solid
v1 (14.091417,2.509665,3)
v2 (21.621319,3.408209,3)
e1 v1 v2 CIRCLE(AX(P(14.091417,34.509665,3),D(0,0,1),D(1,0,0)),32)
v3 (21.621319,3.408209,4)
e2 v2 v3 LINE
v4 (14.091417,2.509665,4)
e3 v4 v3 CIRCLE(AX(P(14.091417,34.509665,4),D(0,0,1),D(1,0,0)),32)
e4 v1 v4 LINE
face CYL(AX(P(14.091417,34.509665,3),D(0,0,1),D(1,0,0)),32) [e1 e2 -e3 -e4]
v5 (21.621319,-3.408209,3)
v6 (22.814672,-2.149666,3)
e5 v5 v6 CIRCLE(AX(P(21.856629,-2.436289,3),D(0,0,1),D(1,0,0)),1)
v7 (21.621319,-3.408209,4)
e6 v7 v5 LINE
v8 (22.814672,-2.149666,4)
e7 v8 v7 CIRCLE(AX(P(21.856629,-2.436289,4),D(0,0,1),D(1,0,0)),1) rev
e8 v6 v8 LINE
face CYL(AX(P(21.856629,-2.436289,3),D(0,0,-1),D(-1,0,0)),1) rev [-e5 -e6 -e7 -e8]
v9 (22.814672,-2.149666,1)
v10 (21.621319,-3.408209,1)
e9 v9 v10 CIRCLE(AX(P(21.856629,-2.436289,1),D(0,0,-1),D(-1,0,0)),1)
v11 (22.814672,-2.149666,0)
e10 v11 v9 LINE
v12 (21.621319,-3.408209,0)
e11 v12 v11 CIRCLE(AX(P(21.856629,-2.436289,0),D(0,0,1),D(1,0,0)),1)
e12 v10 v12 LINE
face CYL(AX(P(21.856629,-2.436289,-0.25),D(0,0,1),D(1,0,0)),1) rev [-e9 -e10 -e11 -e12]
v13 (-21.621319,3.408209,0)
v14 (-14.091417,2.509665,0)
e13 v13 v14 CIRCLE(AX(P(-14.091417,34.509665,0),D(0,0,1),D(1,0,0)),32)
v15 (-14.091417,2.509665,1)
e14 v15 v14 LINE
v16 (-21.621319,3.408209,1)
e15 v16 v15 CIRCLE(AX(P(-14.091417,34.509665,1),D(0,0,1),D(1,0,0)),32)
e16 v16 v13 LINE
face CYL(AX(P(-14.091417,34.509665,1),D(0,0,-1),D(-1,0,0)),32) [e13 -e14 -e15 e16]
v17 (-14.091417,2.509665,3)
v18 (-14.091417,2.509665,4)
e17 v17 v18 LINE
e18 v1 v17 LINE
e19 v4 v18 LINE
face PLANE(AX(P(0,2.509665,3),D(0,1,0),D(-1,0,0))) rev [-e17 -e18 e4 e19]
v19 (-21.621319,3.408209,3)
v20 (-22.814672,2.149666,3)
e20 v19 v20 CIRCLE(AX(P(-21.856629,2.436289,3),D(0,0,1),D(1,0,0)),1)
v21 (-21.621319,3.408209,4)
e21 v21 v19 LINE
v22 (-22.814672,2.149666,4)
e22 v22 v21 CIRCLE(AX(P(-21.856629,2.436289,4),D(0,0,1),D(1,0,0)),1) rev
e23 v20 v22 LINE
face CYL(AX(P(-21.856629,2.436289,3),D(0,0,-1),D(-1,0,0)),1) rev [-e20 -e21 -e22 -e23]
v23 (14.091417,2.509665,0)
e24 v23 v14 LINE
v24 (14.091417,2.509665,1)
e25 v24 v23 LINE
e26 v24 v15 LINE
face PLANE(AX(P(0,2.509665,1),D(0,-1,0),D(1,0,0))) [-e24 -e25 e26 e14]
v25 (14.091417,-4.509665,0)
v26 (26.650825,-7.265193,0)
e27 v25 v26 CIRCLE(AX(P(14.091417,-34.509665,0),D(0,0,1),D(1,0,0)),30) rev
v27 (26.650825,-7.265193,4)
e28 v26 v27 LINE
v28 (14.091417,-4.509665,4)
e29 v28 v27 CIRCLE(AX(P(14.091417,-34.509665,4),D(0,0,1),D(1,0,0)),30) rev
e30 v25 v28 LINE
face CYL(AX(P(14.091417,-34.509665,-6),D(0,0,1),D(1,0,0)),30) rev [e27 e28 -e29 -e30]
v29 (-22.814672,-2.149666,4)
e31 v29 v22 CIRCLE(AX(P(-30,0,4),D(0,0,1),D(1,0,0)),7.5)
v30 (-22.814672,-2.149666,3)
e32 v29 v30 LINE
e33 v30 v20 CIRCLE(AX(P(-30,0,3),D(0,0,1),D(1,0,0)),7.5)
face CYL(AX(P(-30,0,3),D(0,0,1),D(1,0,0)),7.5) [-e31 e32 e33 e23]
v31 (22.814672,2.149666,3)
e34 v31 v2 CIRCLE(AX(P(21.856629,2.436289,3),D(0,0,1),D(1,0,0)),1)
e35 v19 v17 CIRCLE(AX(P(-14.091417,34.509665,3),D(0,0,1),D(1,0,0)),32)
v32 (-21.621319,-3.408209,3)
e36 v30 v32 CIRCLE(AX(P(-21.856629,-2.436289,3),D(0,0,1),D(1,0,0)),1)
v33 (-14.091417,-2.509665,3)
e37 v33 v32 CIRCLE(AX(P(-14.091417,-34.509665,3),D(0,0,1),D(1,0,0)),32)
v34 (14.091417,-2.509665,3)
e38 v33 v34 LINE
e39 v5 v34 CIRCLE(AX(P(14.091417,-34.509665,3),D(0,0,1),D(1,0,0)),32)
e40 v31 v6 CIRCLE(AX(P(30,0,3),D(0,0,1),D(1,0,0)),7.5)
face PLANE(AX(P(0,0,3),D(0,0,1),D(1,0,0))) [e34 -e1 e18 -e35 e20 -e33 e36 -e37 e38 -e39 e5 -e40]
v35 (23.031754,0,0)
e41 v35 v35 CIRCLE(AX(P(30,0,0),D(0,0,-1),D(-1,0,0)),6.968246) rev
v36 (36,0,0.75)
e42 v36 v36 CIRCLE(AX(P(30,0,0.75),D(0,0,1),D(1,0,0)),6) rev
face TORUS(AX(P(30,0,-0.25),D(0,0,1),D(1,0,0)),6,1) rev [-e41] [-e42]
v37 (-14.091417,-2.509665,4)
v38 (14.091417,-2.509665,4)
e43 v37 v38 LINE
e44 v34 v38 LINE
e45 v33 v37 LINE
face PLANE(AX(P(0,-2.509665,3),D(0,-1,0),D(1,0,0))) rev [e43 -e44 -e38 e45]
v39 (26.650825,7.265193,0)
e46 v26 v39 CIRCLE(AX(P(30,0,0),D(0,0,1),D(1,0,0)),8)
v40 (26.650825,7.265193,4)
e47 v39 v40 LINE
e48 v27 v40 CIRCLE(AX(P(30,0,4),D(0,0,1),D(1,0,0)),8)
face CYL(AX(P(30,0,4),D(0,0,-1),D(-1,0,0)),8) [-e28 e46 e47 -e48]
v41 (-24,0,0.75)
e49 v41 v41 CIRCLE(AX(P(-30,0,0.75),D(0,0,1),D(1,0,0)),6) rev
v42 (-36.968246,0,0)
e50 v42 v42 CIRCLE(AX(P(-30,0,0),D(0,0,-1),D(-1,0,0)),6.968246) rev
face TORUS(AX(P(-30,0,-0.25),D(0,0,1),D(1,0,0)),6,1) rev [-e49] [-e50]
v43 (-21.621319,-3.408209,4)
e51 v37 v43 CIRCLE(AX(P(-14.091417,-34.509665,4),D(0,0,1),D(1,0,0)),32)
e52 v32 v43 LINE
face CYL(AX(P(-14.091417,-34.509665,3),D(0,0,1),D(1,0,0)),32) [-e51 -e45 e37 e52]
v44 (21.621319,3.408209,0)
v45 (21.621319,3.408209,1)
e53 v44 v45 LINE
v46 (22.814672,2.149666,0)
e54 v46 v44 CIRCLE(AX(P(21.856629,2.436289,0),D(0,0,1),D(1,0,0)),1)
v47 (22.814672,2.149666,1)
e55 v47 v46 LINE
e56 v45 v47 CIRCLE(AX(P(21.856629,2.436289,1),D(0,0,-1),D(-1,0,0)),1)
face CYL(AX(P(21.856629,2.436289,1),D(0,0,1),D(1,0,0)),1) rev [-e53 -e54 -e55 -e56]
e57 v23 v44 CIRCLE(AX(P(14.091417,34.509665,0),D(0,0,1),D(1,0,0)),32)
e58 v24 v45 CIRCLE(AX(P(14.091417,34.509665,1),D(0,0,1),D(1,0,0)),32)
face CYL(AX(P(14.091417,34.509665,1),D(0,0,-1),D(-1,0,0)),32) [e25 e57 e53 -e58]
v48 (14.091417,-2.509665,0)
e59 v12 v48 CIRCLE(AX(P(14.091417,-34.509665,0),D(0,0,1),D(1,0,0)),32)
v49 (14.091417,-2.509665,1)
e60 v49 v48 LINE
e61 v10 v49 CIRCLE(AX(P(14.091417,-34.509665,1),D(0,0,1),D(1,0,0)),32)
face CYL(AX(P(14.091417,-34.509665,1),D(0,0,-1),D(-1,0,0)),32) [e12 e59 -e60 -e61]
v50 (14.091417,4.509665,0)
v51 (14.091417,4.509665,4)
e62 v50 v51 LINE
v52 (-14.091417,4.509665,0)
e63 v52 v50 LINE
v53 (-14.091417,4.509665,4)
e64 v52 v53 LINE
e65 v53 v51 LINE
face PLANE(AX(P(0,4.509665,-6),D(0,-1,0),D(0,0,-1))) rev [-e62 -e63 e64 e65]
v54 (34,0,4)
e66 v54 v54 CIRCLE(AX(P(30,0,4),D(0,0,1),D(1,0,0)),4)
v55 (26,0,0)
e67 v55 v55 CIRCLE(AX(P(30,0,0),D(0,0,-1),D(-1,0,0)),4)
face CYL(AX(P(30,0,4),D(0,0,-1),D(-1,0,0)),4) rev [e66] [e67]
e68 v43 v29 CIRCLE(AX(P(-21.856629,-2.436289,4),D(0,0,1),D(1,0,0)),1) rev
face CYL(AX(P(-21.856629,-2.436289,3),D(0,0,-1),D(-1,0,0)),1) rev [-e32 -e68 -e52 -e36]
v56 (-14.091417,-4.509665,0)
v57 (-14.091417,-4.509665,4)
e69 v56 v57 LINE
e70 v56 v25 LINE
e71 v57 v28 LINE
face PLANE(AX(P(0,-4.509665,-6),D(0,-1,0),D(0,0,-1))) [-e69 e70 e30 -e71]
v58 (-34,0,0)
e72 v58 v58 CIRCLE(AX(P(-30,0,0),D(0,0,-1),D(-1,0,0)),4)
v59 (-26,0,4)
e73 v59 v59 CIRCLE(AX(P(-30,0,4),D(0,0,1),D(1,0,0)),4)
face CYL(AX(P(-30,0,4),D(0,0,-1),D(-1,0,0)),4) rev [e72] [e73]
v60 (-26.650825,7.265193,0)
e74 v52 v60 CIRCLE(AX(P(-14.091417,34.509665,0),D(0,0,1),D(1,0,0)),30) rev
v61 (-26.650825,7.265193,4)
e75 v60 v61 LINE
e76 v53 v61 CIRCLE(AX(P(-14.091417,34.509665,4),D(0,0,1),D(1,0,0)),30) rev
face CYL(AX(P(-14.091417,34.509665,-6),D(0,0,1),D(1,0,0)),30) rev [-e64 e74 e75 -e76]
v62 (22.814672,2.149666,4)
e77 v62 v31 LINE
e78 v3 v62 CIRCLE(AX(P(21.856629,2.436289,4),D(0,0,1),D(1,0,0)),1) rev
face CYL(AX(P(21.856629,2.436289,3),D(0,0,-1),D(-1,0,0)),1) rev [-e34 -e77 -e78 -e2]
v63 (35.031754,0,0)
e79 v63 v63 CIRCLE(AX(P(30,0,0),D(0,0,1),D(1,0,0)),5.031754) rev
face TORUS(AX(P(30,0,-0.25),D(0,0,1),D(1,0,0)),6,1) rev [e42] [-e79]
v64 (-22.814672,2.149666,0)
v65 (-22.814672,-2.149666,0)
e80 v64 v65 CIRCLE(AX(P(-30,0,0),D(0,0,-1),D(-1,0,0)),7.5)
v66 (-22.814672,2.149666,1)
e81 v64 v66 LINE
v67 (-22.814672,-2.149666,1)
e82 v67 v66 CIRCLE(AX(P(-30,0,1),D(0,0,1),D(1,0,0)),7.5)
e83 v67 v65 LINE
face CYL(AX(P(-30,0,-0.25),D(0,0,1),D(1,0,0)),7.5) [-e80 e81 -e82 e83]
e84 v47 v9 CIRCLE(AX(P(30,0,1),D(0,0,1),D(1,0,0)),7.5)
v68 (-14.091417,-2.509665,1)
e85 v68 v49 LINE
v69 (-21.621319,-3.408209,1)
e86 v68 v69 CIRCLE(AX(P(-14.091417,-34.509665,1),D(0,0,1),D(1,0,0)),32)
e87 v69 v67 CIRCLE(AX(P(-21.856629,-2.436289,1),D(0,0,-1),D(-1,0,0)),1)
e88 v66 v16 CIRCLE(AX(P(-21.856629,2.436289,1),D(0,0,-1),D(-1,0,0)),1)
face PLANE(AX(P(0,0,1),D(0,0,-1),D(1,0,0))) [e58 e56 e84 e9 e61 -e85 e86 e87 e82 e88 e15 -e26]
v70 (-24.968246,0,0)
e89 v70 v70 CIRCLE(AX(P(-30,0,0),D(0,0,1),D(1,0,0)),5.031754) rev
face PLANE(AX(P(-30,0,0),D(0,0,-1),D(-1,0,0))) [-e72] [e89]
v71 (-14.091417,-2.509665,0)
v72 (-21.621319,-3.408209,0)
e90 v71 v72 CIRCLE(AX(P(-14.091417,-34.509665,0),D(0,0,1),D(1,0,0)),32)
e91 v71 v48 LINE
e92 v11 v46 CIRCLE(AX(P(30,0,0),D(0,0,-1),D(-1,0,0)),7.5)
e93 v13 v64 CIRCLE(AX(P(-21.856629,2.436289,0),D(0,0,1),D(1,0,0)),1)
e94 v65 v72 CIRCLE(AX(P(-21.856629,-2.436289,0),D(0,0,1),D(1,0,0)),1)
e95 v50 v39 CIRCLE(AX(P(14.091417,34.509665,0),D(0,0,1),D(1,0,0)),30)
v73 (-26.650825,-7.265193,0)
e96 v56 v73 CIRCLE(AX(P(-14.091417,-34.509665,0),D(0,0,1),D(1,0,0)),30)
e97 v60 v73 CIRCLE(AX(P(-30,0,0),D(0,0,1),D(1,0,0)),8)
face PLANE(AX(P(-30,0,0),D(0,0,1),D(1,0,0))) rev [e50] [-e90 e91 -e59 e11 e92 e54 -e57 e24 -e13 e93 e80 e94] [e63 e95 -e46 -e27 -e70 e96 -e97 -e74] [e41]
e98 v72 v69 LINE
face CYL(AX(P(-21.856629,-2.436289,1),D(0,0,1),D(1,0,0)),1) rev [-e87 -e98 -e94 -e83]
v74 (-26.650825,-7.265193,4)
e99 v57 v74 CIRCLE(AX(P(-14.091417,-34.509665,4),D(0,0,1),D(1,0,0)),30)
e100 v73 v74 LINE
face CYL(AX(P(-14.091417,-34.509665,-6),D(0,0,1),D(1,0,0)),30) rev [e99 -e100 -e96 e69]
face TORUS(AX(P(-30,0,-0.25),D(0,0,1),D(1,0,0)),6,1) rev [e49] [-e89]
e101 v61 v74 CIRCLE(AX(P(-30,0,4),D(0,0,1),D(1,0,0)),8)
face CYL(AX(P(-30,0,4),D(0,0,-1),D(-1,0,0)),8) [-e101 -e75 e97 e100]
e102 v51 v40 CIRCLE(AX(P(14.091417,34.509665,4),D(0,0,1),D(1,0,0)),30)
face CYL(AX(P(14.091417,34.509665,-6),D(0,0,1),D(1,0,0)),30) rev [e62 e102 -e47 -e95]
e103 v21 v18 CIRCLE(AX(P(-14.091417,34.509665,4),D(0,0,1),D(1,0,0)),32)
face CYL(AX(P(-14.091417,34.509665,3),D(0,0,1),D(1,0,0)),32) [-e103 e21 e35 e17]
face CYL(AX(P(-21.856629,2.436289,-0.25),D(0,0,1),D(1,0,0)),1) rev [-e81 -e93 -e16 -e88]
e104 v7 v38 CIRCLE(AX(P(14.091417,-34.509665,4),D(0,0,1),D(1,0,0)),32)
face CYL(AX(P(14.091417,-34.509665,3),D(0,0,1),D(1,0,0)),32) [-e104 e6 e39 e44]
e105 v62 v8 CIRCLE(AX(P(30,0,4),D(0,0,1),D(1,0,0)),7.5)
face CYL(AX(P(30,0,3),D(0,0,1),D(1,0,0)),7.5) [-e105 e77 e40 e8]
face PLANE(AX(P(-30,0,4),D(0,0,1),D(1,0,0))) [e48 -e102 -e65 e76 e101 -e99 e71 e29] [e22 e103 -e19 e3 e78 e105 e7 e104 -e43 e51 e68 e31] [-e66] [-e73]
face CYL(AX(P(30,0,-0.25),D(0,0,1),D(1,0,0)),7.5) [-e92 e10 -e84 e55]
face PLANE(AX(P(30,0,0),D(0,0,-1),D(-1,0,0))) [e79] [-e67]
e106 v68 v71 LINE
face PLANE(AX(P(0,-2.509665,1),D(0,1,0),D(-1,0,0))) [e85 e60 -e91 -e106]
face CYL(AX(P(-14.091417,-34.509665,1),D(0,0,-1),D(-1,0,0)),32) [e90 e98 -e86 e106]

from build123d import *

# Parameters (mm, degrees)
SKETCH_1_R             = 4
EXTRUDE_1_DEPTH        = 4
CUT_EXTRUDE_START      = -10
CUT_EXTRUDE_1_DEPTH    = 10
CUT_EXTRUDE_2_DEPTH    = 1
FILLET_1_R             = 1
SKETCH_5_R             = 7.5
SKETCH_5_R_2           = 4
EXTRUDE_2_DEPTH        = 0.25
FILLET_1_OF_MIRROR_1_R = 1
SKETCH_4_R             = 7
SKETCH_4_R_2           = 5
CUT_EXTRUDE_3_DEPTH    = 1
FILLET_2_R             = 1
CUT_EXTRUDE_START_2    = -0.25
SKETCH_6_R             = 7.5
CUT_EXTRUDE_4_DEPTH    = 0.25


with BuildPart() as part:
    # 草图1 → 凸台-拉伸1 (new body)
    with BuildSketch(Plane.XY):
        with BuildLine():
            Line((-30, 8), (30, 8))
            ThreePointArc((30, 8), (38, 0), (30, -8))
            Line((30, -8), (-30, -8))
            ThreePointArc((-30, -8), (-38, 0), (-30, 8))
        make_face()
        with Locations((-30, 0)):
            Circle(SKETCH_1_R, mode=Mode.SUBTRACT)
        with Locations((30, 0)):
            Circle(SKETCH_1_R, mode=Mode.SUBTRACT)
    extrude(amount=EXTRUDE_1_DEPTH)

    # 草图2 → 切除-拉伸1 (cut)
    with BuildSketch(Plane.XY.offset(4).offset(CUT_EXTRUDE_START)):
        with BuildLine():
            Line((30, 8), (-30, 8))
            ThreePointArc((-30, 8), (-28.285581944, 7.814139155), (-26.650824686, 7.265192683))
            ThreePointArc((-26.650824686, 7.265192683), (-20.520484967, 5.206643412), (-14.091417259, 4.509665243))
            Line((-14.091417259, 4.509665243), (14.091417259, 4.509665243))
            ThreePointArc((14.091417259, 4.509665243), (20.520484967, 5.206643412), (26.650824686, 7.265192683))
            ThreePointArc((26.650824686, 7.265192683), (28.285581944, 7.814139155), (30, 8))
        make_face()
        with BuildLine():
            Line((14.091417259, -4.509665243), (-14.091417259, -4.509665243))
            ThreePointArc((-14.091417259, -4.509665243), (-20.520484967, -5.206643412), (-26.650824686, -7.265192683))
            ThreePointArc((-26.650824686, -7.265192683), (-28.285581944, -7.814139155), (-30, -8))
            Line((-30, -8), (30, -8))
            ThreePointArc((30, -8), (28.285581944, -7.814139155), (26.650824686, -7.265192683))
            ThreePointArc((26.650824686, -7.265192683), (20.520484967, -5.206643412), (14.091417259, -4.509665243))
        make_face()
    extrude(amount=CUT_EXTRUDE_1_DEPTH, mode=Mode.SUBTRACT)

    # 草图3 → 切除-拉伸2 (cut)
    with BuildSketch(Plane.XY.offset(4)):
        with BuildLine():
            ThreePointArc((-23.634199351, -3.965675491), (-18.918027247, -2.875761974), (-14.091417259, -2.509665243))
            Line((-14.091417259, -2.509665243), (14.091417259, -2.509665243))
            ThreePointArc((14.091417259, -2.509665243), (18.918027247, -2.875761974), (23.634199351, -3.965675491))
            ThreePointArc((23.634199351, -3.965675491), (22.5, 0), (23.634199351, 3.965675491))
            ThreePointArc((23.634199351, 3.965675491), (18.918027247, 2.875761974), (14.091417259, 2.509665243))
            Line((14.091417259, 2.509665243), (-14.091417259, 2.509665243))
            ThreePointArc((-14.091417259, 2.509665243), (-18.918027247, 2.875761974), (-23.634199351, 3.965675491))
            ThreePointArc((-23.634199351, 3.965675491), (-22.789122631, 2.062340313), (-22.5, 0))
            ThreePointArc((-22.5, 0), (-22.789122631, -2.062340313), (-23.634199351, -3.965675491))
        make_face()
    cut_extrude_2 = extrude(amount=-CUT_EXTRUDE_2_DEPTH, mode=Mode.SUBTRACT)

    # 圆角1
    fillet_1_edges = [part.edges().sort_by_distance(p)[0] for p in [
        (23.634199351, -3.965675491, 3.5),
        (-23.634199351, -3.965675491, 3.5),
        (-23.634199351, 3.965675491, 3.5),
        (23.634199351, 3.965675491, 3.5),
    ]]
    fillet(fillet_1_edges, radius=FILLET_1_R)

    # 草图5 → 凸台-拉伸2 (add)
    # profile 1 of 2: a face of its own
    with BuildSketch(Plane(origin=(0, 0, 0), x_dir=(-1, 0, 0), z_dir=(0, 0, -1))):
        with Locations((30, 0)):
            Circle(SKETCH_5_R)
        with Locations((30, 0)):
            Circle(SKETCH_5_R_2, mode=Mode.SUBTRACT)
    # profile 2 of 2: a face of its own
    with BuildSketch(Plane(origin=(0, 0, 0), x_dir=(-1, 0, 0), z_dir=(0, 0, -1))):
        with Locations(Location((-30, 0, 0), (0, 0, 180))):
            Circle(SKETCH_5_R)
        with Locations((-30, 0)):
            Circle(SKETCH_5_R_2, mode=Mode.SUBTRACT)
    extrude(amount=EXTRUDE_2_DEPTH)

    # 镜向1: 切除-拉伸2 across plane
    add(cut_extrude_2.mirror(Plane(origin=(0, 0, 2), x_dir=(1, 0, 0), z_dir=(0, 0, -1))), mode=Mode.SUBTRACT)

    # 圆角1 of 镜向1
    fillet_1_of_mirror_1_edges = [part.edges().sort_by_distance(p)[0] for p in [
        (23.634199351, -3.965675491, 0.5),
        (-23.634199351, -3.965675491, 0.5),
        (-23.634199351, 3.965675491, 0.5),
        (23.634199351, 3.965675491, 0.5),
    ]]
    fillet(fillet_1_of_mirror_1_edges, radius=FILLET_1_OF_MIRROR_1_R)

    # 草图4 → 切除-拉伸3 (cut)
    # profile 1 of 2: a face of its own
    with BuildSketch(Plane.XY.offset(-0.25)):
        with Locations((30, 0)):
            Circle(SKETCH_4_R)
        with Locations((30, 0)):
            Circle(SKETCH_4_R_2, mode=Mode.SUBTRACT)
    # profile 2 of 2: a face of its own
    with BuildSketch(Plane.XY.offset(-0.25)):
        with Locations((-30, 0)):
            Circle(SKETCH_4_R)
        with Locations((-30, 0)):
            Circle(SKETCH_4_R_2, mode=Mode.SUBTRACT)
    extrude(amount=CUT_EXTRUDE_3_DEPTH, mode=Mode.SUBTRACT)

    # 圆角2
    fillet_2_edges = [part.edges().sort_by_distance(p)[0] for p in [
        (23, 0, 0.75),
        (25, 0, 0.75),
        (-37, 0, 0.75),
        (-35, 0, 0.75),
    ]]
    fillet(fillet_2_edges, radius=FILLET_2_R - 0.0001)  # a hair under: the kernel refuses the full size

    # 草图6 → 切除-拉伸4 (cut)
    with BuildSketch(Plane(origin=(0, 0, -0.25), x_dir=(-1, 0, 0), z_dir=(0, 0, -1)).offset(CUT_EXTRUDE_START_2)):
        with Locations((30, 0)):
            Circle(SKETCH_6_R)
        with Locations((-30, 0)):
            Circle(SKETCH_6_R)
    extrude(amount=CUT_EXTRUDE_4_DEPTH, mode=Mode.SUBTRACT)


solid = part.part
